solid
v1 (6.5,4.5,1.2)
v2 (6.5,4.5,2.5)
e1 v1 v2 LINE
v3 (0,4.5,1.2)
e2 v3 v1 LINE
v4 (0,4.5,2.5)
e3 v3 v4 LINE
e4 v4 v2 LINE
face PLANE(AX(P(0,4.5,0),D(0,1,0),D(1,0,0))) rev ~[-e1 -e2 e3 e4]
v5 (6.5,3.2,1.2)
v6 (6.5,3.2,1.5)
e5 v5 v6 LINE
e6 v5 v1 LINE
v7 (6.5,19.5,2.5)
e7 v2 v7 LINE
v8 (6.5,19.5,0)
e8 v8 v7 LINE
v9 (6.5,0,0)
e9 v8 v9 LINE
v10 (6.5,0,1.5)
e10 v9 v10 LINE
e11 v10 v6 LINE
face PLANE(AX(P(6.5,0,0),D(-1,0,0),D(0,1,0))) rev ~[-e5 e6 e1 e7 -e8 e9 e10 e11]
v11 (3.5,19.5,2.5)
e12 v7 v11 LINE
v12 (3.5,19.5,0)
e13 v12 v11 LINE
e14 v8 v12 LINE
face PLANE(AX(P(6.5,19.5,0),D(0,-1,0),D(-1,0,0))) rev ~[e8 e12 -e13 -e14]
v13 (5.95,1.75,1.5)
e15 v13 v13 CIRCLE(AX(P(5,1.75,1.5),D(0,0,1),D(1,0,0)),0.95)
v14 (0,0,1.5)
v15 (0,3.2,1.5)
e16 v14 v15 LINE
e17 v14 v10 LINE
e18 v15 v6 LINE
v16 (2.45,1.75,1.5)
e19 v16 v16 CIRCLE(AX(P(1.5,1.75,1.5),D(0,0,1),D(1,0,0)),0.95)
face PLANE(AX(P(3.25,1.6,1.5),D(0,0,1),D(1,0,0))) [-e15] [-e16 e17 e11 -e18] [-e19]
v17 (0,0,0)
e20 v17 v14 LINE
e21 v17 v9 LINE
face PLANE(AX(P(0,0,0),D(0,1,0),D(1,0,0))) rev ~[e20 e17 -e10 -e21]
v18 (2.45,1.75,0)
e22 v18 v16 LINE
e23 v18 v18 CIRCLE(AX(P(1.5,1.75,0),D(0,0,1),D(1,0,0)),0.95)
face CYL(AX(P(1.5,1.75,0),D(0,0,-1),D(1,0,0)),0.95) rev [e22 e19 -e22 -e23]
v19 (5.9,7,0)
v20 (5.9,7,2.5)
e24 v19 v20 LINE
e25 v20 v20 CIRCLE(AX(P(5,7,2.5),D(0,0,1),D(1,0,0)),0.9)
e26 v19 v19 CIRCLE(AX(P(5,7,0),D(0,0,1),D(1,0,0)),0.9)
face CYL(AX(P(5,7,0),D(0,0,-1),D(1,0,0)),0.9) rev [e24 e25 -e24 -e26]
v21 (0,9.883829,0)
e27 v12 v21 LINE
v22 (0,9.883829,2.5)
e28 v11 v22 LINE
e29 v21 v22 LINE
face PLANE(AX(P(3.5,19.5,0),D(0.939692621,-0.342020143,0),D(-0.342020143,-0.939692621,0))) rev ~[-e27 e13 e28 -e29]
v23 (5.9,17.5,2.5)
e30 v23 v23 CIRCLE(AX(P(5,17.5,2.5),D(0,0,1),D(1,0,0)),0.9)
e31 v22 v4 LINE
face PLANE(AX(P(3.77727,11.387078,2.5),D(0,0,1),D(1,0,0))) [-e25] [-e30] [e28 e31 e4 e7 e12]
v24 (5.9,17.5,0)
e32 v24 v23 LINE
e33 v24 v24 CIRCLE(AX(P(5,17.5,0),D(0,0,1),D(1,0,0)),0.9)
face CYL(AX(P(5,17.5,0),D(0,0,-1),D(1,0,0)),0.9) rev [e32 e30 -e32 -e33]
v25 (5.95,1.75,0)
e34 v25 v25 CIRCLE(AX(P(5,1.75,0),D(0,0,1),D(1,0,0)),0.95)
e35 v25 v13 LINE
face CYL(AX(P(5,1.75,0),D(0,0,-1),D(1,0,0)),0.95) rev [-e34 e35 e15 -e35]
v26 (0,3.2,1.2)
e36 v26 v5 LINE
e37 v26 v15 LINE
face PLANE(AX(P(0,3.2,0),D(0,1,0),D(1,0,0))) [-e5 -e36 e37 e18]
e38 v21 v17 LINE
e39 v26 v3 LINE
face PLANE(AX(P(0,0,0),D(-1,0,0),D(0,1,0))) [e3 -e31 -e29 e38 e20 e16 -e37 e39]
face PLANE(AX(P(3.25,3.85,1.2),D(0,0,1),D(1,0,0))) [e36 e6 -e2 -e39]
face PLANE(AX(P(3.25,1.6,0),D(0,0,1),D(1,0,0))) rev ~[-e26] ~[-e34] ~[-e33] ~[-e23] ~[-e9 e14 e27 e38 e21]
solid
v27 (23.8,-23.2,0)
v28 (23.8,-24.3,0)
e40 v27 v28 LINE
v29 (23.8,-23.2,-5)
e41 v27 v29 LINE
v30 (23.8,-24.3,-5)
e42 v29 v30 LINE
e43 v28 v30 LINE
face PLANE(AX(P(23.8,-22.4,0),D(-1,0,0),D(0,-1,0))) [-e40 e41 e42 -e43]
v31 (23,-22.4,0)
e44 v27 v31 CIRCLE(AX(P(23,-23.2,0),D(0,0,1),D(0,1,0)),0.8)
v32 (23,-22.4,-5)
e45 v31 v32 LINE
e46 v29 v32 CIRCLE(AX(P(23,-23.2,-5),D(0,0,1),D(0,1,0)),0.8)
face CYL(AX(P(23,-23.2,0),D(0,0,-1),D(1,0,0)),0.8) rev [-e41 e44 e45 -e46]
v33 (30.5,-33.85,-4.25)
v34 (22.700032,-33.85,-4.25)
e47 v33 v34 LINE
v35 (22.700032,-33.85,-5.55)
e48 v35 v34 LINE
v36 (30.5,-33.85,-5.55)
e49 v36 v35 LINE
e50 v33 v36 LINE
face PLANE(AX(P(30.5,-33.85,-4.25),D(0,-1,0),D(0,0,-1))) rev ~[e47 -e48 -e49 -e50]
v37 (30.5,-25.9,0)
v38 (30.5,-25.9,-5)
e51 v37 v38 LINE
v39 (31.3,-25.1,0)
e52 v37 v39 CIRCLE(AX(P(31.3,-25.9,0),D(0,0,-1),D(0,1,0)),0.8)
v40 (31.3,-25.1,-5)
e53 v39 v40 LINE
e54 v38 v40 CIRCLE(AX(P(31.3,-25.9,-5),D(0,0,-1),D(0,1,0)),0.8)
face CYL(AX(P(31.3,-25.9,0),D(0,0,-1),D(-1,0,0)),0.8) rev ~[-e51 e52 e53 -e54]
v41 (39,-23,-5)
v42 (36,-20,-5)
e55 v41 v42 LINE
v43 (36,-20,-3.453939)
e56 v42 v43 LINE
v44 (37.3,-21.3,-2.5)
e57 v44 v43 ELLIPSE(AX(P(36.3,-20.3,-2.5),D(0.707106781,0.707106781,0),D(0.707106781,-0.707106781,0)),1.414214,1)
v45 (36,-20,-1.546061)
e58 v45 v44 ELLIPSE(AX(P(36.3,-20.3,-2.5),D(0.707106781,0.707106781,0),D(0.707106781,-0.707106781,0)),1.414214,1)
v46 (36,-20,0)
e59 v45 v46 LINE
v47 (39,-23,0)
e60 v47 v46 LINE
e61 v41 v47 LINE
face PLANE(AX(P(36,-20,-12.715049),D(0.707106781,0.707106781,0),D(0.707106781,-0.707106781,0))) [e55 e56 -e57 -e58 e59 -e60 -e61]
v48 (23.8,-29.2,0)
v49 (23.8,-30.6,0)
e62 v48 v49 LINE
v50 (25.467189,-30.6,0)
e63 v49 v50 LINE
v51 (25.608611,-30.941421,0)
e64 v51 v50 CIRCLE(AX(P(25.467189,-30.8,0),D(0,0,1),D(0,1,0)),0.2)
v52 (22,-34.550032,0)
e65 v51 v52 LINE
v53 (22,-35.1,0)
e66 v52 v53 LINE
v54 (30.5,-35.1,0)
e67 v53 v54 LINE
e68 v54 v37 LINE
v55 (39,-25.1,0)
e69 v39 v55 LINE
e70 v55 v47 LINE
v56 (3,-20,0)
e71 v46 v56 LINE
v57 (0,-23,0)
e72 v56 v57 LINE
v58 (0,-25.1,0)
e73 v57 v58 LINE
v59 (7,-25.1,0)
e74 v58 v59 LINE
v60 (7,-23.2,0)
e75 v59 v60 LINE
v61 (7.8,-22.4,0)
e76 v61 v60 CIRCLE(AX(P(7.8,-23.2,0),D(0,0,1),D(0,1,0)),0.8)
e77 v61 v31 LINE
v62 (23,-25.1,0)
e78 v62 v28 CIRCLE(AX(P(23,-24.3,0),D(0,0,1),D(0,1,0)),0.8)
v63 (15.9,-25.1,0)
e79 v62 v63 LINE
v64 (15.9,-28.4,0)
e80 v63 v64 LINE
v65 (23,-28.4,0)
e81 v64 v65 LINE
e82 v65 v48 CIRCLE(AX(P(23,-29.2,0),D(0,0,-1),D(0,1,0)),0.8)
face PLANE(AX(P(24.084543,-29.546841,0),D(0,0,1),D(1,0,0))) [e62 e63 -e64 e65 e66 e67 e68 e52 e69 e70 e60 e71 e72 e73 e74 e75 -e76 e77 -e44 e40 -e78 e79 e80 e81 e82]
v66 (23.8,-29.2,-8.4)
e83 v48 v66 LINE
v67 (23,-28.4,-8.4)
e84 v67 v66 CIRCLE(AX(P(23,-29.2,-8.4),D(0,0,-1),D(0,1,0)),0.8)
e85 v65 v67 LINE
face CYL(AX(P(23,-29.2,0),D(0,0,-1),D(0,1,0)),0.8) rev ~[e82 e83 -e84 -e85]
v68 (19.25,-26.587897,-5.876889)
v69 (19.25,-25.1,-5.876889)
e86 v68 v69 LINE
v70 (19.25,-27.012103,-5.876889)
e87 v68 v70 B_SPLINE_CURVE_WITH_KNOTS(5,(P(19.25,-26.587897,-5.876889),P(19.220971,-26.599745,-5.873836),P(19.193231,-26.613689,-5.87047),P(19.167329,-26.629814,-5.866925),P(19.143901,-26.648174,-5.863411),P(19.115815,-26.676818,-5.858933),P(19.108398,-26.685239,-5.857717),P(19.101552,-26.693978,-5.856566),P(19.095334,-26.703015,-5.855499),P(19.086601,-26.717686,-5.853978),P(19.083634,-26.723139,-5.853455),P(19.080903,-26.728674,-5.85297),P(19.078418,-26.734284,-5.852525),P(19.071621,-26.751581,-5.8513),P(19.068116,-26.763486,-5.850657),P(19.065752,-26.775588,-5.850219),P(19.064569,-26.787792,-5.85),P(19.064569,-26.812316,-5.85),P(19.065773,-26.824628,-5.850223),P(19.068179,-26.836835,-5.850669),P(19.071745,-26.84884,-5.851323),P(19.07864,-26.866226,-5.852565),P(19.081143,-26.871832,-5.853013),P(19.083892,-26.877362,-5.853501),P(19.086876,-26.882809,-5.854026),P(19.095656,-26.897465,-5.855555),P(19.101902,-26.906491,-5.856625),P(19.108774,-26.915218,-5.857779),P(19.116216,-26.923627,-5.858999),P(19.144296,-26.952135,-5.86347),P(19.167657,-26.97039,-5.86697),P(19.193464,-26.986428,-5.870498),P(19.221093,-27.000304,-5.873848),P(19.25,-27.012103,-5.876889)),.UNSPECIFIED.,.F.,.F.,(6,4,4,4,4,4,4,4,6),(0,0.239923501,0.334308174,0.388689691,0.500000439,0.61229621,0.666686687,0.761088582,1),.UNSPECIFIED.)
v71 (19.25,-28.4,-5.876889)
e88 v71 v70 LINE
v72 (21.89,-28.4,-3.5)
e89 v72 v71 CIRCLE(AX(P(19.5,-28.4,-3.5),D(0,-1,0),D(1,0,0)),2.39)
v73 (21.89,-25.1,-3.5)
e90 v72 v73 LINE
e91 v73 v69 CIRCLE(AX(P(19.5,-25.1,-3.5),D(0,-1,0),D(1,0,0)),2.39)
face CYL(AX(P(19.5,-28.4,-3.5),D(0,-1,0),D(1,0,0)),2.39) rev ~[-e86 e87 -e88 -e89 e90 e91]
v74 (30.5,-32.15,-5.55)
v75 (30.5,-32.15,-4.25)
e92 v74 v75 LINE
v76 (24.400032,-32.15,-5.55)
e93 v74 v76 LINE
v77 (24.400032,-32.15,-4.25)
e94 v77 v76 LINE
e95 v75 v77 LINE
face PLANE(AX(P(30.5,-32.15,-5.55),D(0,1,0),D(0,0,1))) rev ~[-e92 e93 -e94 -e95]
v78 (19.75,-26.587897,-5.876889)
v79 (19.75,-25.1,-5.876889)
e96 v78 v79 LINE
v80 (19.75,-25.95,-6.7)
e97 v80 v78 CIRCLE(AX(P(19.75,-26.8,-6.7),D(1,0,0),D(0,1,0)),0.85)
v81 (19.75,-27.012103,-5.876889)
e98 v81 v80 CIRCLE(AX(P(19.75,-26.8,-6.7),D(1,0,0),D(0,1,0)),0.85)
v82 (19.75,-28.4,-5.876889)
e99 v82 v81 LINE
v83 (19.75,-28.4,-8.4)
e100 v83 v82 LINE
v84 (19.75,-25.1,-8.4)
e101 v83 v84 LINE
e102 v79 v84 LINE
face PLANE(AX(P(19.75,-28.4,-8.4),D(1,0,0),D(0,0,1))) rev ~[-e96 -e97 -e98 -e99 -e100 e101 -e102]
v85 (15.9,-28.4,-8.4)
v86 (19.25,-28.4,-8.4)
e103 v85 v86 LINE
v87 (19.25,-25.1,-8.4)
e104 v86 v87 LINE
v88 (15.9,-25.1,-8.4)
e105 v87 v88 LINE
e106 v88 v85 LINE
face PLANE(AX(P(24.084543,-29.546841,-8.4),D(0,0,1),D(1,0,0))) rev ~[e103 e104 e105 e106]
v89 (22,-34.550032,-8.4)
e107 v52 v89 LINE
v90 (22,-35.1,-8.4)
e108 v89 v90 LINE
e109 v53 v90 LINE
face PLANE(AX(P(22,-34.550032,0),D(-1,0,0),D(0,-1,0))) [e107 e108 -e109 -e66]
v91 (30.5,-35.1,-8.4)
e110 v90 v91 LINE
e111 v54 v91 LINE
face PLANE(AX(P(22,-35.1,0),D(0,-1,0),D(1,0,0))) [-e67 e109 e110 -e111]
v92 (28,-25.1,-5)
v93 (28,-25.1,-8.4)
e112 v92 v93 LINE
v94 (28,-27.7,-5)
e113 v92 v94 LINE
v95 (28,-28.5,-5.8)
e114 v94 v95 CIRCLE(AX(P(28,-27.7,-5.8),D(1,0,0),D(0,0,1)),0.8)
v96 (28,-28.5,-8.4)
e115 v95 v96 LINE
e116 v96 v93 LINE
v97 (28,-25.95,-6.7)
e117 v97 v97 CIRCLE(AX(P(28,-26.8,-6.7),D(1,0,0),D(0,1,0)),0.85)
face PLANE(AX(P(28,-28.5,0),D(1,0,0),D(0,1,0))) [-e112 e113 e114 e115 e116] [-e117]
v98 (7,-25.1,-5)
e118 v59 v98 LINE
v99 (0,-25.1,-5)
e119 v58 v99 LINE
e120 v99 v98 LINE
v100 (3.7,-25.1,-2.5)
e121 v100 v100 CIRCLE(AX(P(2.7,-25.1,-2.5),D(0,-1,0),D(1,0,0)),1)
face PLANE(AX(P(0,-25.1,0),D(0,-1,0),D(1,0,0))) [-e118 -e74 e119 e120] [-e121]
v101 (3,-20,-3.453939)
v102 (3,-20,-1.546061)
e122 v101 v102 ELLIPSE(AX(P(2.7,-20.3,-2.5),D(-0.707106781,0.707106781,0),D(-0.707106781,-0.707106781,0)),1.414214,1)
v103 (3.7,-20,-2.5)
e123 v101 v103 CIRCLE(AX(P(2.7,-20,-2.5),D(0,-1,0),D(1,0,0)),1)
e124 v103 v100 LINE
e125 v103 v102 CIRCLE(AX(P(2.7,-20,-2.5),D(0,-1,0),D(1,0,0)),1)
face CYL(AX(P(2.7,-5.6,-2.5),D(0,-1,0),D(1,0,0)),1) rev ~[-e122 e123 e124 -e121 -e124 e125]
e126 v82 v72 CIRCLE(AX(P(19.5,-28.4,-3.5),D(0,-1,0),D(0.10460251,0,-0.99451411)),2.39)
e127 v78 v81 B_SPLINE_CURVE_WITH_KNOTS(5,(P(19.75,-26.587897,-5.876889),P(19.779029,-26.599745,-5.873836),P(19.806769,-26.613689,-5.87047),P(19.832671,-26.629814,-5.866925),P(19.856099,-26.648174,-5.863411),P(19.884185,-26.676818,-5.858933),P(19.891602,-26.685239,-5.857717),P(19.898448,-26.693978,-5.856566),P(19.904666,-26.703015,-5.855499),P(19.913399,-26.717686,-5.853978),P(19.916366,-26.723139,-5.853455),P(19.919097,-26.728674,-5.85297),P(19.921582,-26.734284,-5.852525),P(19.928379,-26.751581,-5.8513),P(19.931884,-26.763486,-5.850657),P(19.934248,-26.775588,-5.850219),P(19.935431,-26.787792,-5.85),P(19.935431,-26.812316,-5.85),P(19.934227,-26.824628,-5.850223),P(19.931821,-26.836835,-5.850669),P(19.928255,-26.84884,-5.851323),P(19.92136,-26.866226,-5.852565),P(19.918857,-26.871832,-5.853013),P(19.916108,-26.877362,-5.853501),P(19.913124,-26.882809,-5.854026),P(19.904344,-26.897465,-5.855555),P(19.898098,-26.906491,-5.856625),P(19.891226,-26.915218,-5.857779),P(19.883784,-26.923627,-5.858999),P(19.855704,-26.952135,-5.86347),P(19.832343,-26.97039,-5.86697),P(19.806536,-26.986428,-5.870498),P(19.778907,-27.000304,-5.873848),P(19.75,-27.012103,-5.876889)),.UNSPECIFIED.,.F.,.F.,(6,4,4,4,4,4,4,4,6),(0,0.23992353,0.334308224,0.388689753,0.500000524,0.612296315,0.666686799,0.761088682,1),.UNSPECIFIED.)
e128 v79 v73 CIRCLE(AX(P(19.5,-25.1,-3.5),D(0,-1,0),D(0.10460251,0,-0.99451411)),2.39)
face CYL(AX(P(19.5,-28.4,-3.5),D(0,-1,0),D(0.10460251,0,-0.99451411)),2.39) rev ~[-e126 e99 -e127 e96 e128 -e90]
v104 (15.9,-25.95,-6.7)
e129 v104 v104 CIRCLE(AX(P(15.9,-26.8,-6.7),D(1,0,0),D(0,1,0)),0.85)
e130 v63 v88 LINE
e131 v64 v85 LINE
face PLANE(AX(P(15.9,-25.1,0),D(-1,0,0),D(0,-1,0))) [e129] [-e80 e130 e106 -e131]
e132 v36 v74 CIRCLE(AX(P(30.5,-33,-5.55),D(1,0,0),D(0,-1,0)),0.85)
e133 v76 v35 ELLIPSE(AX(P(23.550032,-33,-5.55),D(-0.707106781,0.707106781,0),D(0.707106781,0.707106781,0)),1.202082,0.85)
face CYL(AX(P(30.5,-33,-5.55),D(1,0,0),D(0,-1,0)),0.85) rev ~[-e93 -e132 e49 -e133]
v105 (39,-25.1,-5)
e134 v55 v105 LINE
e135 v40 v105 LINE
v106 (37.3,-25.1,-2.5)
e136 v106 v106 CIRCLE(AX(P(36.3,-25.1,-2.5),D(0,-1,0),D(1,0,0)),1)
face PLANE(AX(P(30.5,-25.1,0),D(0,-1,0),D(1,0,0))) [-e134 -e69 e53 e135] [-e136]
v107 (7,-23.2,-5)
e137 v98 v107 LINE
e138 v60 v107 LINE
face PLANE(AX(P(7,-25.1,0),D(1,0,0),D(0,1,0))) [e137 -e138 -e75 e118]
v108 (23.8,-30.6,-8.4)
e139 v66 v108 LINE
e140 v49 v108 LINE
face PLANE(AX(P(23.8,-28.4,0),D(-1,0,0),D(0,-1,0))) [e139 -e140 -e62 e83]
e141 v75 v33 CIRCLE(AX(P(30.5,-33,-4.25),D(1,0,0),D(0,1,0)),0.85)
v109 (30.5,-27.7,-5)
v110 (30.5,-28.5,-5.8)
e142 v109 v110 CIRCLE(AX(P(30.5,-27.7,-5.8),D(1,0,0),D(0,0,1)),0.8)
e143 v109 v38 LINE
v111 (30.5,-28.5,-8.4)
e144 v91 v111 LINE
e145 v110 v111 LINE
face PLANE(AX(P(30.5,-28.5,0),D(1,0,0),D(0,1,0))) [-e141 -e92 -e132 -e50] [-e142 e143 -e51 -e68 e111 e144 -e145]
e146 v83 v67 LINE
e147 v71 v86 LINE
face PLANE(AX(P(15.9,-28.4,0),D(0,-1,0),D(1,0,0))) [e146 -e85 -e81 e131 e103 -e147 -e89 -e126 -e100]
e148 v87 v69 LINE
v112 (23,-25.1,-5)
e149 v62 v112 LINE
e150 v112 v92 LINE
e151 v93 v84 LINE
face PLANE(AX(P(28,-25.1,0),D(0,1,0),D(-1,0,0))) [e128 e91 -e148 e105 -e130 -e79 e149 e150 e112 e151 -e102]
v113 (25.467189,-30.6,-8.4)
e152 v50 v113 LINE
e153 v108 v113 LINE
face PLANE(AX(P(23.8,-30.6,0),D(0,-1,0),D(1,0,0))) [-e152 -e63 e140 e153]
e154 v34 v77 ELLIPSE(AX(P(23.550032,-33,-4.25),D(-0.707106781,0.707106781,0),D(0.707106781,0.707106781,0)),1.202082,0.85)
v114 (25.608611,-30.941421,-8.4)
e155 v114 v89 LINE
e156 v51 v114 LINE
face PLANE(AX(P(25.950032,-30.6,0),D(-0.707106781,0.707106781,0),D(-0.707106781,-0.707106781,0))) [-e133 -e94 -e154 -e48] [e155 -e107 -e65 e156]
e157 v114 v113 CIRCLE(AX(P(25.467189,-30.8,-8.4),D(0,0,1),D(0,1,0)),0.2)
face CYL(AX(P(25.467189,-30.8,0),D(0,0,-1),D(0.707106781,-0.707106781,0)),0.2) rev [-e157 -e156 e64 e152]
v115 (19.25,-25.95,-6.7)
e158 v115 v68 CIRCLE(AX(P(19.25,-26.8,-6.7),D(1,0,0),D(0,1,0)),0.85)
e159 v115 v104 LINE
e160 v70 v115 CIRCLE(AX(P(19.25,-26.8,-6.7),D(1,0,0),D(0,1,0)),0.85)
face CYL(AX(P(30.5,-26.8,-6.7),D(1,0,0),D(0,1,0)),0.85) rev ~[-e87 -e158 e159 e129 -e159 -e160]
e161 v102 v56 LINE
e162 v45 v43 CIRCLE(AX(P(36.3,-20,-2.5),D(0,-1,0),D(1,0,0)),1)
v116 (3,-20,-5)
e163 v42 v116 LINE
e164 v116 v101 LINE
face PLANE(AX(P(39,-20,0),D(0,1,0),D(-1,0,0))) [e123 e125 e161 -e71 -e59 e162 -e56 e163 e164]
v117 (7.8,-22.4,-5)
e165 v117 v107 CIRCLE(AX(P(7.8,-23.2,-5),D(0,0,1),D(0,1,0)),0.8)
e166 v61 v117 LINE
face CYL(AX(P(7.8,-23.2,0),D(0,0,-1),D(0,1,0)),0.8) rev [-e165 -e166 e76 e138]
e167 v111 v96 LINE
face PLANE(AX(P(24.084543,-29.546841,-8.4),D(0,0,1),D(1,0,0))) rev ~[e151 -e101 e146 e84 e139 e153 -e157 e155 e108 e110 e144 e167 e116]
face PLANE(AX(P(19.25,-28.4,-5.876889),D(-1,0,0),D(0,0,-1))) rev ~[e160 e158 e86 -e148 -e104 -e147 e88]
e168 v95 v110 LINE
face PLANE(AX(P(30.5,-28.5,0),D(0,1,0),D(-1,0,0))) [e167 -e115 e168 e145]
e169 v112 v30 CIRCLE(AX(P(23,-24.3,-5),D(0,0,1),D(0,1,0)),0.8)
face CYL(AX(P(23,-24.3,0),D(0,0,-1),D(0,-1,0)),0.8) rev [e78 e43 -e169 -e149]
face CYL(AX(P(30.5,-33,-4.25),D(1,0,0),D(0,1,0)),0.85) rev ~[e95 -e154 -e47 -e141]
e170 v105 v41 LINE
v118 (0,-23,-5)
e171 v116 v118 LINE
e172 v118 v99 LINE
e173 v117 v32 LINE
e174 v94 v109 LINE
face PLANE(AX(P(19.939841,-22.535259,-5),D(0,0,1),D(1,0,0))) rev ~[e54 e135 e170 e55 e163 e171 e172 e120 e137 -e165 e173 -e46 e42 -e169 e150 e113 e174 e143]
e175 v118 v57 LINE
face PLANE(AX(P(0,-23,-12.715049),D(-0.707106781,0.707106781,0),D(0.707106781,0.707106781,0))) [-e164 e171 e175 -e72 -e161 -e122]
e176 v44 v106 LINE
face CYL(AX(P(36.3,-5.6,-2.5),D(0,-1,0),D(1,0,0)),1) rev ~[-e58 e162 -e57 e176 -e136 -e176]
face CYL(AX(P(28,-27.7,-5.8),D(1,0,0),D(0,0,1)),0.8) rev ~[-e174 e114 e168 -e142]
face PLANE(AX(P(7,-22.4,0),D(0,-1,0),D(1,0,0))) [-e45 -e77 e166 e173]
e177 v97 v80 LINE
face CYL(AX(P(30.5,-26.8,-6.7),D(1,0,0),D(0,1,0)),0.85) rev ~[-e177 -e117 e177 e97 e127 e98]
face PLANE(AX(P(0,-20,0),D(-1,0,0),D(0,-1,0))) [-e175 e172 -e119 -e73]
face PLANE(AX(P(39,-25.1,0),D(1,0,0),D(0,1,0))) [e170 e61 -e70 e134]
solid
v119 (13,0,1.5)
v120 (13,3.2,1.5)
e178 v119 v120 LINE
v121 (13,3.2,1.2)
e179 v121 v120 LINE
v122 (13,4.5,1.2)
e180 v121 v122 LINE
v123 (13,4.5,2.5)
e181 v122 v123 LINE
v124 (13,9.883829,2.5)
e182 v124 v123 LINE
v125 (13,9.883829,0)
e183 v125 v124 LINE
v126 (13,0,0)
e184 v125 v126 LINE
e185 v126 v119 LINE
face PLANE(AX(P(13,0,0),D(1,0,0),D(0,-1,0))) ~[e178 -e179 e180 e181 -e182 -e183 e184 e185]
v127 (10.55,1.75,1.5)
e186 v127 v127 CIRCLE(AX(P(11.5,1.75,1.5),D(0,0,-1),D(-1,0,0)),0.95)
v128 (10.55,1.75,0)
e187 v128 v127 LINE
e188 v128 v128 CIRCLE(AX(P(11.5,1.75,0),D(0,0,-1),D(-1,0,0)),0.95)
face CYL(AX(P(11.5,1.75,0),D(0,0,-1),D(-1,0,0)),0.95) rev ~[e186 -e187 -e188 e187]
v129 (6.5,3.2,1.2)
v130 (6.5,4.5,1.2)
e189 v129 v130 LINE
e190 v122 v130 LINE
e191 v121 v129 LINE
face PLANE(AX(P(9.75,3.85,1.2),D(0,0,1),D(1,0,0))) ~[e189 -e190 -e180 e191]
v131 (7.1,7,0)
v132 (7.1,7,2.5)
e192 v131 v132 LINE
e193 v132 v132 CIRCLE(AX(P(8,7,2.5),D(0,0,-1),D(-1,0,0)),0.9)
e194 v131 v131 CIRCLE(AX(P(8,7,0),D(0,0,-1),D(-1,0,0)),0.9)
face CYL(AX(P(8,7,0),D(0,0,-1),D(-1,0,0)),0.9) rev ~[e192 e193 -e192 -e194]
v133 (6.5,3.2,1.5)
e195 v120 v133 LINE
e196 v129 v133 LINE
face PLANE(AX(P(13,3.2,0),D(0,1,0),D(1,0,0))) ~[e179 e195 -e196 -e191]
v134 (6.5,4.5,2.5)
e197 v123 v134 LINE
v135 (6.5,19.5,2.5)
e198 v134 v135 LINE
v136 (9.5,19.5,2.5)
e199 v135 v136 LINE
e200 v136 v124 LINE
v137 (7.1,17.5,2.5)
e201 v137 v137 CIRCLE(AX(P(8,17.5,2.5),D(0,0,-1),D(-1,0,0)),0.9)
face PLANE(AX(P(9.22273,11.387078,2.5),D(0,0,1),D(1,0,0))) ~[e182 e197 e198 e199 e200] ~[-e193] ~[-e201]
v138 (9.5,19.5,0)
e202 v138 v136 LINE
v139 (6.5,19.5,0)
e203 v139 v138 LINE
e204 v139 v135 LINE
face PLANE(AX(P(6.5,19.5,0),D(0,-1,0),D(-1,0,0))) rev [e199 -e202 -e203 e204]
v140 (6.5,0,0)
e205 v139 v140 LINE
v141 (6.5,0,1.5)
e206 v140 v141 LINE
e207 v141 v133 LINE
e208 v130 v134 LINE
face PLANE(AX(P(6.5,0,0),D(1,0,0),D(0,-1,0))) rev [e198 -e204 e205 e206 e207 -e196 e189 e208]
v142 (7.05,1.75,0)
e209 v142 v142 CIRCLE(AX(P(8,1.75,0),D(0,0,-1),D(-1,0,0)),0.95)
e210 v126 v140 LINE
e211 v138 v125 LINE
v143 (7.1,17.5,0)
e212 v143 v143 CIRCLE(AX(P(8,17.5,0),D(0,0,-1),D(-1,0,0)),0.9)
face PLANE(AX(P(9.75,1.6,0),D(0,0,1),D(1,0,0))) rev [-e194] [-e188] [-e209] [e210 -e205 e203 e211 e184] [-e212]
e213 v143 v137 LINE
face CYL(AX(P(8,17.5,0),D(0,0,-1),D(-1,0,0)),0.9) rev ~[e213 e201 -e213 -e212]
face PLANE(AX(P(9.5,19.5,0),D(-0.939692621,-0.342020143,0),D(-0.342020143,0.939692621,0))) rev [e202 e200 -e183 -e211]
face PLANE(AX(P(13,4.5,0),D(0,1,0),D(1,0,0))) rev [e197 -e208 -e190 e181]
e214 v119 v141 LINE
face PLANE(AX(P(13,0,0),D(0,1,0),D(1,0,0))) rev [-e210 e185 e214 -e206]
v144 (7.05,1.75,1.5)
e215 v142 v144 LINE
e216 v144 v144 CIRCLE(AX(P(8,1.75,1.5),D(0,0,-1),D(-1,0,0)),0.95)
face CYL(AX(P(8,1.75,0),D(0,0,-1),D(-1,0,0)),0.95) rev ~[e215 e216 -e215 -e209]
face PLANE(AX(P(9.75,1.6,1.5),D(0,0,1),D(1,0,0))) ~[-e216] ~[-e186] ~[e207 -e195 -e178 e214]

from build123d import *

# Parameters (mm, degrees)
F0_R         = 0.9
F1_DEPTH     = 2.5
F0_W         = 6.5
F0_H         = 1.3
F2_DEPTH     = 1.2
F0_H_2       = 3.2
F0_R_2       = 0.95
F3_DEPTH     = 1.5
F5_DEPTH     = 5
F6_DEPTH     = 8.4
F8_D         = 2
F8_DEPTH     = 14.4
F8_TIP       = 0.600860619
F10_DEPTH    = 3.8
F11_R        = 0.85
F12_DEPTH    = 30.501
F13_R        = 0.8
F14_T1_DEPTH = 20.4300979278
F15_R        = 0.2


# Not quite as in the source:
# - a fillet or chamfer that OpenCascade refuses, or shapes differently, is made with other operations: its cross-section is extruded or revolved along the edge and cut away or added


with BuildPart() as f1:
    # F0 (on Top) → F1 (new body)
    with BuildSketch(Plane.XY):
        Polygon((0, 9.8838290319), (0, 4.5), (6.5, 4.5), (6.5, 19.5), (3.5, 19.5), align=None)
        with Locations((5, 7)):
            Circle(F0_R, mode=Mode.SUBTRACT)
        with Locations((5, 17.5)):
            Circle(F0_R, mode=Mode.SUBTRACT)
    extrude(amount=F1_DEPTH)

    # F0 (on Top) → F2 (join)
    with BuildSketch(Plane.XY):
        with Locations((3.25, 3.85)):
            Rectangle(F0_W, F0_H)
    extrude(amount=F2_DEPTH)

    # F0 (on Top) → F3 (join)
    with BuildSketch(Plane.XY):
        with Locations((3.25, 1.6)):
            Rectangle(F0_W, F0_H_2)
        with Locations((1.5, 1.75)):
            Circle(F0_R_2, mode=Mode.SUBTRACT)
        with Locations((5, 1.75)):
            Circle(F0_R_2, mode=Mode.SUBTRACT)
    extrude(amount=F3_DEPTH)


with BuildPart() as f4_1:
    # F4: instance of F1
    add(f1.part.mirror(Plane(origin=(6.5, 10.5719562244, 1.1721614227), x_dir=(0, 1, 0), z_dir=(1, 0, 0))))


with BuildPart() as f5:
    # F0 (on Top) → F5 (new body)
    with BuildSketch(Plane.XY):
        Polygon((0, -20), (0, -25.1), (7, -25.1), (7, -22.4), (23.8, -22.4), (23.8, -25.1), (28, -25.1), (28, -28.5), (30.5, -28.5), (30.5, -25.1), (39, -25.1), (39, -20), align=None)
    extrude(amount=-F5_DEPTH)

    # F0 (on Top) → F6 (join)
    with BuildSketch(Plane.XY):
        Polygon((28, -25.1), (23.8, -25.1), (15.9, -25.1), (15.9, -28.4), (23.8, -28.4), (23.8, -30.6), (25.9500320151, -30.6), (22, -34.5500320151), (22, -35.1), (30.5, -35.1), (30.5, -28.5), (28, -28.5), align=None)
    extrude(amount=-F6_DEPTH)

    # F8
    with Locations(Plane(origin=(0, -20, 0), x_dir=(-1, 0, 0), z_dir=(0, 1, 0))):
        with Locations((-2.7, -2.5), (-36.3, -2.5)):
            Hole(F8_D / 2, depth=F8_DEPTH)
            with Locations((0, 0, -(F8_DEPTH + F8_TIP / 2))):  # 118° drill point
                Cone(0, F8_D / 2, F8_TIP, mode=Mode.SUBTRACT)

    # F9 (on face) → F10 (cut)
    with BuildSketch(Plane.XZ.offset(28.4)):
        with BuildLine():
            ThreePointArc((19.75, -5.8768887227), (21.276175667, -5.0991560274), (21.89, -3.5))
            ThreePointArc((21.89, -3.5), (17.9008439726, -1.723824333), (19.25, -5.8768887227))
            Line((19.25, -5.8768887227), (19.75, -5.8768887227))
        make_face()
        with BuildLine():
            ThreePointArc((19.75, -5.8768887227), (19.5, -5.89), (19.25, -5.8768887227))
            Line((19.25, -5.8768887227), (19.25, -8.4))
            Line((19.25, -8.4), (19.75, -8.4))
            Line((19.75, -8.4), (19.75, -5.8768887227))
        make_face()
        with BuildLine():
            Line((19.75, -5.8768887227), (19.25, -5.8768887227))
            ThreePointArc((19.25, -5.8768887227), (19.5, -5.89), (19.75, -5.8768887227))
        make_face()
    extrude(amount=-F10_DEPTH, mode=Mode.SUBTRACT)

    # F11 (on face) → F12 (cut, through all)
    with BuildSketch(Plane.YZ.offset(30.5)):
        with Locations((-26.8, -6.7)):
            Circle(F11_R)
        with BuildLine():
            Line((-33.85, -4.25), (-32.15, -4.25))
            ThreePointArc((-32.15, -4.25), (-33, -3.4), (-33.85, -4.25))
        make_face()
        with BuildLine():
            ThreePointArc((-32.4522774425, -4.9), (-32.2292652292, -4.6084242083), (-32.15, -4.25))
            Line((-32.15, -4.25), (-33.85, -4.25))
            ThreePointArc((-33.85, -4.25), (-33.7707347708, -4.6084242083), (-33.5477225575, -4.9))
            ThreePointArc((-33.5477225575, -4.9), (-33, -4.7), (-32.4522774425, -4.9))
        make_face()
        with BuildLine():
            Line((-33.85, -4.25), (-33.85, -5.55))
            ThreePointArc((-33.85, -5.55), (-33.7707347708, -5.1915757917), (-33.5477225575, -4.9))
            ThreePointArc((-33.5477225575, -4.9), (-33.7707347708, -4.6084242083), (-33.85, -4.25))
        make_face()
        with BuildLine():
            Line((-33.85, -5.55), (-32.15, -5.55))
            ThreePointArc((-32.15, -5.55), (-32.2292652292, -5.1915757917), (-32.4522774425, -4.9))
            ThreePointArc((-32.4522774425, -4.9), (-33, -5.1), (-33.5477225575, -4.9))
            ThreePointArc((-33.5477225575, -4.9), (-33.7707347708, -5.1915757917), (-33.85, -5.55))
        make_face()
        with BuildLine():
            ThreePointArc((-33.5477225575, -4.9), (-33, -5.1), (-32.4522774425, -4.9))
            ThreePointArc((-32.4522774425, -4.9), (-33, -4.7), (-33.5477225575, -4.9))
        make_face()
        with BuildLine():
            ThreePointArc((-32.4522774425, -4.9), (-32.2292652292, -5.1915757917), (-32.15, -5.55))
            Line((-32.15, -5.55), (-32.15, -4.25))
            ThreePointArc((-32.15, -4.25), (-32.2292652292, -4.6084242083), (-32.4522774425, -4.9))
        make_face()
        with BuildLine():
            ThreePointArc((-33.85, -5.55), (-33, -6.4), (-32.15, -5.55))
            Line((-32.15, -5.55), (-33.85, -5.55))
        make_face()
    extrude(amount=-F12_DEPTH, mode=Mode.SUBTRACT)

    # F13
    f13_edges = [f5.edges().sort_by_distance(p)[0] for p in [
        (29.25, -28.5, -5),
        (7, -22.4, -2.5),
        (23.8, -22.4, -2.5),
        (23.8, -25.1, -2.5),
        (30.5, -25.1, -2.5),
        (23.8, -28.4, -4.2),
    ]]
    fillet(f13_edges, radius=F13_R)

    # F14: chamfer of 3 on 2 edges, made by hand

    # F14_s2 → F14_t1 (cut)
    with BuildSketch(Plane.XY.offset(-12.7150489639)):
        Polygon((0, -23), (3, -20), (0, -20), align=None)
        Polygon((36, -20), (39, -23), (39, -20), align=None)
    extrude(amount=F14_T1_DEPTH, mode=Mode.SUBTRACT)

    # F15
    f15_edges = [f5.edges().sort_by_distance(p)[0] for p in [
        (25.950032, -30.6, -4.2),
    ]]
    fillet(f15_edges, radius=F15_R)


solid = Compound([f1.part, f4_1.part, f5.part])
